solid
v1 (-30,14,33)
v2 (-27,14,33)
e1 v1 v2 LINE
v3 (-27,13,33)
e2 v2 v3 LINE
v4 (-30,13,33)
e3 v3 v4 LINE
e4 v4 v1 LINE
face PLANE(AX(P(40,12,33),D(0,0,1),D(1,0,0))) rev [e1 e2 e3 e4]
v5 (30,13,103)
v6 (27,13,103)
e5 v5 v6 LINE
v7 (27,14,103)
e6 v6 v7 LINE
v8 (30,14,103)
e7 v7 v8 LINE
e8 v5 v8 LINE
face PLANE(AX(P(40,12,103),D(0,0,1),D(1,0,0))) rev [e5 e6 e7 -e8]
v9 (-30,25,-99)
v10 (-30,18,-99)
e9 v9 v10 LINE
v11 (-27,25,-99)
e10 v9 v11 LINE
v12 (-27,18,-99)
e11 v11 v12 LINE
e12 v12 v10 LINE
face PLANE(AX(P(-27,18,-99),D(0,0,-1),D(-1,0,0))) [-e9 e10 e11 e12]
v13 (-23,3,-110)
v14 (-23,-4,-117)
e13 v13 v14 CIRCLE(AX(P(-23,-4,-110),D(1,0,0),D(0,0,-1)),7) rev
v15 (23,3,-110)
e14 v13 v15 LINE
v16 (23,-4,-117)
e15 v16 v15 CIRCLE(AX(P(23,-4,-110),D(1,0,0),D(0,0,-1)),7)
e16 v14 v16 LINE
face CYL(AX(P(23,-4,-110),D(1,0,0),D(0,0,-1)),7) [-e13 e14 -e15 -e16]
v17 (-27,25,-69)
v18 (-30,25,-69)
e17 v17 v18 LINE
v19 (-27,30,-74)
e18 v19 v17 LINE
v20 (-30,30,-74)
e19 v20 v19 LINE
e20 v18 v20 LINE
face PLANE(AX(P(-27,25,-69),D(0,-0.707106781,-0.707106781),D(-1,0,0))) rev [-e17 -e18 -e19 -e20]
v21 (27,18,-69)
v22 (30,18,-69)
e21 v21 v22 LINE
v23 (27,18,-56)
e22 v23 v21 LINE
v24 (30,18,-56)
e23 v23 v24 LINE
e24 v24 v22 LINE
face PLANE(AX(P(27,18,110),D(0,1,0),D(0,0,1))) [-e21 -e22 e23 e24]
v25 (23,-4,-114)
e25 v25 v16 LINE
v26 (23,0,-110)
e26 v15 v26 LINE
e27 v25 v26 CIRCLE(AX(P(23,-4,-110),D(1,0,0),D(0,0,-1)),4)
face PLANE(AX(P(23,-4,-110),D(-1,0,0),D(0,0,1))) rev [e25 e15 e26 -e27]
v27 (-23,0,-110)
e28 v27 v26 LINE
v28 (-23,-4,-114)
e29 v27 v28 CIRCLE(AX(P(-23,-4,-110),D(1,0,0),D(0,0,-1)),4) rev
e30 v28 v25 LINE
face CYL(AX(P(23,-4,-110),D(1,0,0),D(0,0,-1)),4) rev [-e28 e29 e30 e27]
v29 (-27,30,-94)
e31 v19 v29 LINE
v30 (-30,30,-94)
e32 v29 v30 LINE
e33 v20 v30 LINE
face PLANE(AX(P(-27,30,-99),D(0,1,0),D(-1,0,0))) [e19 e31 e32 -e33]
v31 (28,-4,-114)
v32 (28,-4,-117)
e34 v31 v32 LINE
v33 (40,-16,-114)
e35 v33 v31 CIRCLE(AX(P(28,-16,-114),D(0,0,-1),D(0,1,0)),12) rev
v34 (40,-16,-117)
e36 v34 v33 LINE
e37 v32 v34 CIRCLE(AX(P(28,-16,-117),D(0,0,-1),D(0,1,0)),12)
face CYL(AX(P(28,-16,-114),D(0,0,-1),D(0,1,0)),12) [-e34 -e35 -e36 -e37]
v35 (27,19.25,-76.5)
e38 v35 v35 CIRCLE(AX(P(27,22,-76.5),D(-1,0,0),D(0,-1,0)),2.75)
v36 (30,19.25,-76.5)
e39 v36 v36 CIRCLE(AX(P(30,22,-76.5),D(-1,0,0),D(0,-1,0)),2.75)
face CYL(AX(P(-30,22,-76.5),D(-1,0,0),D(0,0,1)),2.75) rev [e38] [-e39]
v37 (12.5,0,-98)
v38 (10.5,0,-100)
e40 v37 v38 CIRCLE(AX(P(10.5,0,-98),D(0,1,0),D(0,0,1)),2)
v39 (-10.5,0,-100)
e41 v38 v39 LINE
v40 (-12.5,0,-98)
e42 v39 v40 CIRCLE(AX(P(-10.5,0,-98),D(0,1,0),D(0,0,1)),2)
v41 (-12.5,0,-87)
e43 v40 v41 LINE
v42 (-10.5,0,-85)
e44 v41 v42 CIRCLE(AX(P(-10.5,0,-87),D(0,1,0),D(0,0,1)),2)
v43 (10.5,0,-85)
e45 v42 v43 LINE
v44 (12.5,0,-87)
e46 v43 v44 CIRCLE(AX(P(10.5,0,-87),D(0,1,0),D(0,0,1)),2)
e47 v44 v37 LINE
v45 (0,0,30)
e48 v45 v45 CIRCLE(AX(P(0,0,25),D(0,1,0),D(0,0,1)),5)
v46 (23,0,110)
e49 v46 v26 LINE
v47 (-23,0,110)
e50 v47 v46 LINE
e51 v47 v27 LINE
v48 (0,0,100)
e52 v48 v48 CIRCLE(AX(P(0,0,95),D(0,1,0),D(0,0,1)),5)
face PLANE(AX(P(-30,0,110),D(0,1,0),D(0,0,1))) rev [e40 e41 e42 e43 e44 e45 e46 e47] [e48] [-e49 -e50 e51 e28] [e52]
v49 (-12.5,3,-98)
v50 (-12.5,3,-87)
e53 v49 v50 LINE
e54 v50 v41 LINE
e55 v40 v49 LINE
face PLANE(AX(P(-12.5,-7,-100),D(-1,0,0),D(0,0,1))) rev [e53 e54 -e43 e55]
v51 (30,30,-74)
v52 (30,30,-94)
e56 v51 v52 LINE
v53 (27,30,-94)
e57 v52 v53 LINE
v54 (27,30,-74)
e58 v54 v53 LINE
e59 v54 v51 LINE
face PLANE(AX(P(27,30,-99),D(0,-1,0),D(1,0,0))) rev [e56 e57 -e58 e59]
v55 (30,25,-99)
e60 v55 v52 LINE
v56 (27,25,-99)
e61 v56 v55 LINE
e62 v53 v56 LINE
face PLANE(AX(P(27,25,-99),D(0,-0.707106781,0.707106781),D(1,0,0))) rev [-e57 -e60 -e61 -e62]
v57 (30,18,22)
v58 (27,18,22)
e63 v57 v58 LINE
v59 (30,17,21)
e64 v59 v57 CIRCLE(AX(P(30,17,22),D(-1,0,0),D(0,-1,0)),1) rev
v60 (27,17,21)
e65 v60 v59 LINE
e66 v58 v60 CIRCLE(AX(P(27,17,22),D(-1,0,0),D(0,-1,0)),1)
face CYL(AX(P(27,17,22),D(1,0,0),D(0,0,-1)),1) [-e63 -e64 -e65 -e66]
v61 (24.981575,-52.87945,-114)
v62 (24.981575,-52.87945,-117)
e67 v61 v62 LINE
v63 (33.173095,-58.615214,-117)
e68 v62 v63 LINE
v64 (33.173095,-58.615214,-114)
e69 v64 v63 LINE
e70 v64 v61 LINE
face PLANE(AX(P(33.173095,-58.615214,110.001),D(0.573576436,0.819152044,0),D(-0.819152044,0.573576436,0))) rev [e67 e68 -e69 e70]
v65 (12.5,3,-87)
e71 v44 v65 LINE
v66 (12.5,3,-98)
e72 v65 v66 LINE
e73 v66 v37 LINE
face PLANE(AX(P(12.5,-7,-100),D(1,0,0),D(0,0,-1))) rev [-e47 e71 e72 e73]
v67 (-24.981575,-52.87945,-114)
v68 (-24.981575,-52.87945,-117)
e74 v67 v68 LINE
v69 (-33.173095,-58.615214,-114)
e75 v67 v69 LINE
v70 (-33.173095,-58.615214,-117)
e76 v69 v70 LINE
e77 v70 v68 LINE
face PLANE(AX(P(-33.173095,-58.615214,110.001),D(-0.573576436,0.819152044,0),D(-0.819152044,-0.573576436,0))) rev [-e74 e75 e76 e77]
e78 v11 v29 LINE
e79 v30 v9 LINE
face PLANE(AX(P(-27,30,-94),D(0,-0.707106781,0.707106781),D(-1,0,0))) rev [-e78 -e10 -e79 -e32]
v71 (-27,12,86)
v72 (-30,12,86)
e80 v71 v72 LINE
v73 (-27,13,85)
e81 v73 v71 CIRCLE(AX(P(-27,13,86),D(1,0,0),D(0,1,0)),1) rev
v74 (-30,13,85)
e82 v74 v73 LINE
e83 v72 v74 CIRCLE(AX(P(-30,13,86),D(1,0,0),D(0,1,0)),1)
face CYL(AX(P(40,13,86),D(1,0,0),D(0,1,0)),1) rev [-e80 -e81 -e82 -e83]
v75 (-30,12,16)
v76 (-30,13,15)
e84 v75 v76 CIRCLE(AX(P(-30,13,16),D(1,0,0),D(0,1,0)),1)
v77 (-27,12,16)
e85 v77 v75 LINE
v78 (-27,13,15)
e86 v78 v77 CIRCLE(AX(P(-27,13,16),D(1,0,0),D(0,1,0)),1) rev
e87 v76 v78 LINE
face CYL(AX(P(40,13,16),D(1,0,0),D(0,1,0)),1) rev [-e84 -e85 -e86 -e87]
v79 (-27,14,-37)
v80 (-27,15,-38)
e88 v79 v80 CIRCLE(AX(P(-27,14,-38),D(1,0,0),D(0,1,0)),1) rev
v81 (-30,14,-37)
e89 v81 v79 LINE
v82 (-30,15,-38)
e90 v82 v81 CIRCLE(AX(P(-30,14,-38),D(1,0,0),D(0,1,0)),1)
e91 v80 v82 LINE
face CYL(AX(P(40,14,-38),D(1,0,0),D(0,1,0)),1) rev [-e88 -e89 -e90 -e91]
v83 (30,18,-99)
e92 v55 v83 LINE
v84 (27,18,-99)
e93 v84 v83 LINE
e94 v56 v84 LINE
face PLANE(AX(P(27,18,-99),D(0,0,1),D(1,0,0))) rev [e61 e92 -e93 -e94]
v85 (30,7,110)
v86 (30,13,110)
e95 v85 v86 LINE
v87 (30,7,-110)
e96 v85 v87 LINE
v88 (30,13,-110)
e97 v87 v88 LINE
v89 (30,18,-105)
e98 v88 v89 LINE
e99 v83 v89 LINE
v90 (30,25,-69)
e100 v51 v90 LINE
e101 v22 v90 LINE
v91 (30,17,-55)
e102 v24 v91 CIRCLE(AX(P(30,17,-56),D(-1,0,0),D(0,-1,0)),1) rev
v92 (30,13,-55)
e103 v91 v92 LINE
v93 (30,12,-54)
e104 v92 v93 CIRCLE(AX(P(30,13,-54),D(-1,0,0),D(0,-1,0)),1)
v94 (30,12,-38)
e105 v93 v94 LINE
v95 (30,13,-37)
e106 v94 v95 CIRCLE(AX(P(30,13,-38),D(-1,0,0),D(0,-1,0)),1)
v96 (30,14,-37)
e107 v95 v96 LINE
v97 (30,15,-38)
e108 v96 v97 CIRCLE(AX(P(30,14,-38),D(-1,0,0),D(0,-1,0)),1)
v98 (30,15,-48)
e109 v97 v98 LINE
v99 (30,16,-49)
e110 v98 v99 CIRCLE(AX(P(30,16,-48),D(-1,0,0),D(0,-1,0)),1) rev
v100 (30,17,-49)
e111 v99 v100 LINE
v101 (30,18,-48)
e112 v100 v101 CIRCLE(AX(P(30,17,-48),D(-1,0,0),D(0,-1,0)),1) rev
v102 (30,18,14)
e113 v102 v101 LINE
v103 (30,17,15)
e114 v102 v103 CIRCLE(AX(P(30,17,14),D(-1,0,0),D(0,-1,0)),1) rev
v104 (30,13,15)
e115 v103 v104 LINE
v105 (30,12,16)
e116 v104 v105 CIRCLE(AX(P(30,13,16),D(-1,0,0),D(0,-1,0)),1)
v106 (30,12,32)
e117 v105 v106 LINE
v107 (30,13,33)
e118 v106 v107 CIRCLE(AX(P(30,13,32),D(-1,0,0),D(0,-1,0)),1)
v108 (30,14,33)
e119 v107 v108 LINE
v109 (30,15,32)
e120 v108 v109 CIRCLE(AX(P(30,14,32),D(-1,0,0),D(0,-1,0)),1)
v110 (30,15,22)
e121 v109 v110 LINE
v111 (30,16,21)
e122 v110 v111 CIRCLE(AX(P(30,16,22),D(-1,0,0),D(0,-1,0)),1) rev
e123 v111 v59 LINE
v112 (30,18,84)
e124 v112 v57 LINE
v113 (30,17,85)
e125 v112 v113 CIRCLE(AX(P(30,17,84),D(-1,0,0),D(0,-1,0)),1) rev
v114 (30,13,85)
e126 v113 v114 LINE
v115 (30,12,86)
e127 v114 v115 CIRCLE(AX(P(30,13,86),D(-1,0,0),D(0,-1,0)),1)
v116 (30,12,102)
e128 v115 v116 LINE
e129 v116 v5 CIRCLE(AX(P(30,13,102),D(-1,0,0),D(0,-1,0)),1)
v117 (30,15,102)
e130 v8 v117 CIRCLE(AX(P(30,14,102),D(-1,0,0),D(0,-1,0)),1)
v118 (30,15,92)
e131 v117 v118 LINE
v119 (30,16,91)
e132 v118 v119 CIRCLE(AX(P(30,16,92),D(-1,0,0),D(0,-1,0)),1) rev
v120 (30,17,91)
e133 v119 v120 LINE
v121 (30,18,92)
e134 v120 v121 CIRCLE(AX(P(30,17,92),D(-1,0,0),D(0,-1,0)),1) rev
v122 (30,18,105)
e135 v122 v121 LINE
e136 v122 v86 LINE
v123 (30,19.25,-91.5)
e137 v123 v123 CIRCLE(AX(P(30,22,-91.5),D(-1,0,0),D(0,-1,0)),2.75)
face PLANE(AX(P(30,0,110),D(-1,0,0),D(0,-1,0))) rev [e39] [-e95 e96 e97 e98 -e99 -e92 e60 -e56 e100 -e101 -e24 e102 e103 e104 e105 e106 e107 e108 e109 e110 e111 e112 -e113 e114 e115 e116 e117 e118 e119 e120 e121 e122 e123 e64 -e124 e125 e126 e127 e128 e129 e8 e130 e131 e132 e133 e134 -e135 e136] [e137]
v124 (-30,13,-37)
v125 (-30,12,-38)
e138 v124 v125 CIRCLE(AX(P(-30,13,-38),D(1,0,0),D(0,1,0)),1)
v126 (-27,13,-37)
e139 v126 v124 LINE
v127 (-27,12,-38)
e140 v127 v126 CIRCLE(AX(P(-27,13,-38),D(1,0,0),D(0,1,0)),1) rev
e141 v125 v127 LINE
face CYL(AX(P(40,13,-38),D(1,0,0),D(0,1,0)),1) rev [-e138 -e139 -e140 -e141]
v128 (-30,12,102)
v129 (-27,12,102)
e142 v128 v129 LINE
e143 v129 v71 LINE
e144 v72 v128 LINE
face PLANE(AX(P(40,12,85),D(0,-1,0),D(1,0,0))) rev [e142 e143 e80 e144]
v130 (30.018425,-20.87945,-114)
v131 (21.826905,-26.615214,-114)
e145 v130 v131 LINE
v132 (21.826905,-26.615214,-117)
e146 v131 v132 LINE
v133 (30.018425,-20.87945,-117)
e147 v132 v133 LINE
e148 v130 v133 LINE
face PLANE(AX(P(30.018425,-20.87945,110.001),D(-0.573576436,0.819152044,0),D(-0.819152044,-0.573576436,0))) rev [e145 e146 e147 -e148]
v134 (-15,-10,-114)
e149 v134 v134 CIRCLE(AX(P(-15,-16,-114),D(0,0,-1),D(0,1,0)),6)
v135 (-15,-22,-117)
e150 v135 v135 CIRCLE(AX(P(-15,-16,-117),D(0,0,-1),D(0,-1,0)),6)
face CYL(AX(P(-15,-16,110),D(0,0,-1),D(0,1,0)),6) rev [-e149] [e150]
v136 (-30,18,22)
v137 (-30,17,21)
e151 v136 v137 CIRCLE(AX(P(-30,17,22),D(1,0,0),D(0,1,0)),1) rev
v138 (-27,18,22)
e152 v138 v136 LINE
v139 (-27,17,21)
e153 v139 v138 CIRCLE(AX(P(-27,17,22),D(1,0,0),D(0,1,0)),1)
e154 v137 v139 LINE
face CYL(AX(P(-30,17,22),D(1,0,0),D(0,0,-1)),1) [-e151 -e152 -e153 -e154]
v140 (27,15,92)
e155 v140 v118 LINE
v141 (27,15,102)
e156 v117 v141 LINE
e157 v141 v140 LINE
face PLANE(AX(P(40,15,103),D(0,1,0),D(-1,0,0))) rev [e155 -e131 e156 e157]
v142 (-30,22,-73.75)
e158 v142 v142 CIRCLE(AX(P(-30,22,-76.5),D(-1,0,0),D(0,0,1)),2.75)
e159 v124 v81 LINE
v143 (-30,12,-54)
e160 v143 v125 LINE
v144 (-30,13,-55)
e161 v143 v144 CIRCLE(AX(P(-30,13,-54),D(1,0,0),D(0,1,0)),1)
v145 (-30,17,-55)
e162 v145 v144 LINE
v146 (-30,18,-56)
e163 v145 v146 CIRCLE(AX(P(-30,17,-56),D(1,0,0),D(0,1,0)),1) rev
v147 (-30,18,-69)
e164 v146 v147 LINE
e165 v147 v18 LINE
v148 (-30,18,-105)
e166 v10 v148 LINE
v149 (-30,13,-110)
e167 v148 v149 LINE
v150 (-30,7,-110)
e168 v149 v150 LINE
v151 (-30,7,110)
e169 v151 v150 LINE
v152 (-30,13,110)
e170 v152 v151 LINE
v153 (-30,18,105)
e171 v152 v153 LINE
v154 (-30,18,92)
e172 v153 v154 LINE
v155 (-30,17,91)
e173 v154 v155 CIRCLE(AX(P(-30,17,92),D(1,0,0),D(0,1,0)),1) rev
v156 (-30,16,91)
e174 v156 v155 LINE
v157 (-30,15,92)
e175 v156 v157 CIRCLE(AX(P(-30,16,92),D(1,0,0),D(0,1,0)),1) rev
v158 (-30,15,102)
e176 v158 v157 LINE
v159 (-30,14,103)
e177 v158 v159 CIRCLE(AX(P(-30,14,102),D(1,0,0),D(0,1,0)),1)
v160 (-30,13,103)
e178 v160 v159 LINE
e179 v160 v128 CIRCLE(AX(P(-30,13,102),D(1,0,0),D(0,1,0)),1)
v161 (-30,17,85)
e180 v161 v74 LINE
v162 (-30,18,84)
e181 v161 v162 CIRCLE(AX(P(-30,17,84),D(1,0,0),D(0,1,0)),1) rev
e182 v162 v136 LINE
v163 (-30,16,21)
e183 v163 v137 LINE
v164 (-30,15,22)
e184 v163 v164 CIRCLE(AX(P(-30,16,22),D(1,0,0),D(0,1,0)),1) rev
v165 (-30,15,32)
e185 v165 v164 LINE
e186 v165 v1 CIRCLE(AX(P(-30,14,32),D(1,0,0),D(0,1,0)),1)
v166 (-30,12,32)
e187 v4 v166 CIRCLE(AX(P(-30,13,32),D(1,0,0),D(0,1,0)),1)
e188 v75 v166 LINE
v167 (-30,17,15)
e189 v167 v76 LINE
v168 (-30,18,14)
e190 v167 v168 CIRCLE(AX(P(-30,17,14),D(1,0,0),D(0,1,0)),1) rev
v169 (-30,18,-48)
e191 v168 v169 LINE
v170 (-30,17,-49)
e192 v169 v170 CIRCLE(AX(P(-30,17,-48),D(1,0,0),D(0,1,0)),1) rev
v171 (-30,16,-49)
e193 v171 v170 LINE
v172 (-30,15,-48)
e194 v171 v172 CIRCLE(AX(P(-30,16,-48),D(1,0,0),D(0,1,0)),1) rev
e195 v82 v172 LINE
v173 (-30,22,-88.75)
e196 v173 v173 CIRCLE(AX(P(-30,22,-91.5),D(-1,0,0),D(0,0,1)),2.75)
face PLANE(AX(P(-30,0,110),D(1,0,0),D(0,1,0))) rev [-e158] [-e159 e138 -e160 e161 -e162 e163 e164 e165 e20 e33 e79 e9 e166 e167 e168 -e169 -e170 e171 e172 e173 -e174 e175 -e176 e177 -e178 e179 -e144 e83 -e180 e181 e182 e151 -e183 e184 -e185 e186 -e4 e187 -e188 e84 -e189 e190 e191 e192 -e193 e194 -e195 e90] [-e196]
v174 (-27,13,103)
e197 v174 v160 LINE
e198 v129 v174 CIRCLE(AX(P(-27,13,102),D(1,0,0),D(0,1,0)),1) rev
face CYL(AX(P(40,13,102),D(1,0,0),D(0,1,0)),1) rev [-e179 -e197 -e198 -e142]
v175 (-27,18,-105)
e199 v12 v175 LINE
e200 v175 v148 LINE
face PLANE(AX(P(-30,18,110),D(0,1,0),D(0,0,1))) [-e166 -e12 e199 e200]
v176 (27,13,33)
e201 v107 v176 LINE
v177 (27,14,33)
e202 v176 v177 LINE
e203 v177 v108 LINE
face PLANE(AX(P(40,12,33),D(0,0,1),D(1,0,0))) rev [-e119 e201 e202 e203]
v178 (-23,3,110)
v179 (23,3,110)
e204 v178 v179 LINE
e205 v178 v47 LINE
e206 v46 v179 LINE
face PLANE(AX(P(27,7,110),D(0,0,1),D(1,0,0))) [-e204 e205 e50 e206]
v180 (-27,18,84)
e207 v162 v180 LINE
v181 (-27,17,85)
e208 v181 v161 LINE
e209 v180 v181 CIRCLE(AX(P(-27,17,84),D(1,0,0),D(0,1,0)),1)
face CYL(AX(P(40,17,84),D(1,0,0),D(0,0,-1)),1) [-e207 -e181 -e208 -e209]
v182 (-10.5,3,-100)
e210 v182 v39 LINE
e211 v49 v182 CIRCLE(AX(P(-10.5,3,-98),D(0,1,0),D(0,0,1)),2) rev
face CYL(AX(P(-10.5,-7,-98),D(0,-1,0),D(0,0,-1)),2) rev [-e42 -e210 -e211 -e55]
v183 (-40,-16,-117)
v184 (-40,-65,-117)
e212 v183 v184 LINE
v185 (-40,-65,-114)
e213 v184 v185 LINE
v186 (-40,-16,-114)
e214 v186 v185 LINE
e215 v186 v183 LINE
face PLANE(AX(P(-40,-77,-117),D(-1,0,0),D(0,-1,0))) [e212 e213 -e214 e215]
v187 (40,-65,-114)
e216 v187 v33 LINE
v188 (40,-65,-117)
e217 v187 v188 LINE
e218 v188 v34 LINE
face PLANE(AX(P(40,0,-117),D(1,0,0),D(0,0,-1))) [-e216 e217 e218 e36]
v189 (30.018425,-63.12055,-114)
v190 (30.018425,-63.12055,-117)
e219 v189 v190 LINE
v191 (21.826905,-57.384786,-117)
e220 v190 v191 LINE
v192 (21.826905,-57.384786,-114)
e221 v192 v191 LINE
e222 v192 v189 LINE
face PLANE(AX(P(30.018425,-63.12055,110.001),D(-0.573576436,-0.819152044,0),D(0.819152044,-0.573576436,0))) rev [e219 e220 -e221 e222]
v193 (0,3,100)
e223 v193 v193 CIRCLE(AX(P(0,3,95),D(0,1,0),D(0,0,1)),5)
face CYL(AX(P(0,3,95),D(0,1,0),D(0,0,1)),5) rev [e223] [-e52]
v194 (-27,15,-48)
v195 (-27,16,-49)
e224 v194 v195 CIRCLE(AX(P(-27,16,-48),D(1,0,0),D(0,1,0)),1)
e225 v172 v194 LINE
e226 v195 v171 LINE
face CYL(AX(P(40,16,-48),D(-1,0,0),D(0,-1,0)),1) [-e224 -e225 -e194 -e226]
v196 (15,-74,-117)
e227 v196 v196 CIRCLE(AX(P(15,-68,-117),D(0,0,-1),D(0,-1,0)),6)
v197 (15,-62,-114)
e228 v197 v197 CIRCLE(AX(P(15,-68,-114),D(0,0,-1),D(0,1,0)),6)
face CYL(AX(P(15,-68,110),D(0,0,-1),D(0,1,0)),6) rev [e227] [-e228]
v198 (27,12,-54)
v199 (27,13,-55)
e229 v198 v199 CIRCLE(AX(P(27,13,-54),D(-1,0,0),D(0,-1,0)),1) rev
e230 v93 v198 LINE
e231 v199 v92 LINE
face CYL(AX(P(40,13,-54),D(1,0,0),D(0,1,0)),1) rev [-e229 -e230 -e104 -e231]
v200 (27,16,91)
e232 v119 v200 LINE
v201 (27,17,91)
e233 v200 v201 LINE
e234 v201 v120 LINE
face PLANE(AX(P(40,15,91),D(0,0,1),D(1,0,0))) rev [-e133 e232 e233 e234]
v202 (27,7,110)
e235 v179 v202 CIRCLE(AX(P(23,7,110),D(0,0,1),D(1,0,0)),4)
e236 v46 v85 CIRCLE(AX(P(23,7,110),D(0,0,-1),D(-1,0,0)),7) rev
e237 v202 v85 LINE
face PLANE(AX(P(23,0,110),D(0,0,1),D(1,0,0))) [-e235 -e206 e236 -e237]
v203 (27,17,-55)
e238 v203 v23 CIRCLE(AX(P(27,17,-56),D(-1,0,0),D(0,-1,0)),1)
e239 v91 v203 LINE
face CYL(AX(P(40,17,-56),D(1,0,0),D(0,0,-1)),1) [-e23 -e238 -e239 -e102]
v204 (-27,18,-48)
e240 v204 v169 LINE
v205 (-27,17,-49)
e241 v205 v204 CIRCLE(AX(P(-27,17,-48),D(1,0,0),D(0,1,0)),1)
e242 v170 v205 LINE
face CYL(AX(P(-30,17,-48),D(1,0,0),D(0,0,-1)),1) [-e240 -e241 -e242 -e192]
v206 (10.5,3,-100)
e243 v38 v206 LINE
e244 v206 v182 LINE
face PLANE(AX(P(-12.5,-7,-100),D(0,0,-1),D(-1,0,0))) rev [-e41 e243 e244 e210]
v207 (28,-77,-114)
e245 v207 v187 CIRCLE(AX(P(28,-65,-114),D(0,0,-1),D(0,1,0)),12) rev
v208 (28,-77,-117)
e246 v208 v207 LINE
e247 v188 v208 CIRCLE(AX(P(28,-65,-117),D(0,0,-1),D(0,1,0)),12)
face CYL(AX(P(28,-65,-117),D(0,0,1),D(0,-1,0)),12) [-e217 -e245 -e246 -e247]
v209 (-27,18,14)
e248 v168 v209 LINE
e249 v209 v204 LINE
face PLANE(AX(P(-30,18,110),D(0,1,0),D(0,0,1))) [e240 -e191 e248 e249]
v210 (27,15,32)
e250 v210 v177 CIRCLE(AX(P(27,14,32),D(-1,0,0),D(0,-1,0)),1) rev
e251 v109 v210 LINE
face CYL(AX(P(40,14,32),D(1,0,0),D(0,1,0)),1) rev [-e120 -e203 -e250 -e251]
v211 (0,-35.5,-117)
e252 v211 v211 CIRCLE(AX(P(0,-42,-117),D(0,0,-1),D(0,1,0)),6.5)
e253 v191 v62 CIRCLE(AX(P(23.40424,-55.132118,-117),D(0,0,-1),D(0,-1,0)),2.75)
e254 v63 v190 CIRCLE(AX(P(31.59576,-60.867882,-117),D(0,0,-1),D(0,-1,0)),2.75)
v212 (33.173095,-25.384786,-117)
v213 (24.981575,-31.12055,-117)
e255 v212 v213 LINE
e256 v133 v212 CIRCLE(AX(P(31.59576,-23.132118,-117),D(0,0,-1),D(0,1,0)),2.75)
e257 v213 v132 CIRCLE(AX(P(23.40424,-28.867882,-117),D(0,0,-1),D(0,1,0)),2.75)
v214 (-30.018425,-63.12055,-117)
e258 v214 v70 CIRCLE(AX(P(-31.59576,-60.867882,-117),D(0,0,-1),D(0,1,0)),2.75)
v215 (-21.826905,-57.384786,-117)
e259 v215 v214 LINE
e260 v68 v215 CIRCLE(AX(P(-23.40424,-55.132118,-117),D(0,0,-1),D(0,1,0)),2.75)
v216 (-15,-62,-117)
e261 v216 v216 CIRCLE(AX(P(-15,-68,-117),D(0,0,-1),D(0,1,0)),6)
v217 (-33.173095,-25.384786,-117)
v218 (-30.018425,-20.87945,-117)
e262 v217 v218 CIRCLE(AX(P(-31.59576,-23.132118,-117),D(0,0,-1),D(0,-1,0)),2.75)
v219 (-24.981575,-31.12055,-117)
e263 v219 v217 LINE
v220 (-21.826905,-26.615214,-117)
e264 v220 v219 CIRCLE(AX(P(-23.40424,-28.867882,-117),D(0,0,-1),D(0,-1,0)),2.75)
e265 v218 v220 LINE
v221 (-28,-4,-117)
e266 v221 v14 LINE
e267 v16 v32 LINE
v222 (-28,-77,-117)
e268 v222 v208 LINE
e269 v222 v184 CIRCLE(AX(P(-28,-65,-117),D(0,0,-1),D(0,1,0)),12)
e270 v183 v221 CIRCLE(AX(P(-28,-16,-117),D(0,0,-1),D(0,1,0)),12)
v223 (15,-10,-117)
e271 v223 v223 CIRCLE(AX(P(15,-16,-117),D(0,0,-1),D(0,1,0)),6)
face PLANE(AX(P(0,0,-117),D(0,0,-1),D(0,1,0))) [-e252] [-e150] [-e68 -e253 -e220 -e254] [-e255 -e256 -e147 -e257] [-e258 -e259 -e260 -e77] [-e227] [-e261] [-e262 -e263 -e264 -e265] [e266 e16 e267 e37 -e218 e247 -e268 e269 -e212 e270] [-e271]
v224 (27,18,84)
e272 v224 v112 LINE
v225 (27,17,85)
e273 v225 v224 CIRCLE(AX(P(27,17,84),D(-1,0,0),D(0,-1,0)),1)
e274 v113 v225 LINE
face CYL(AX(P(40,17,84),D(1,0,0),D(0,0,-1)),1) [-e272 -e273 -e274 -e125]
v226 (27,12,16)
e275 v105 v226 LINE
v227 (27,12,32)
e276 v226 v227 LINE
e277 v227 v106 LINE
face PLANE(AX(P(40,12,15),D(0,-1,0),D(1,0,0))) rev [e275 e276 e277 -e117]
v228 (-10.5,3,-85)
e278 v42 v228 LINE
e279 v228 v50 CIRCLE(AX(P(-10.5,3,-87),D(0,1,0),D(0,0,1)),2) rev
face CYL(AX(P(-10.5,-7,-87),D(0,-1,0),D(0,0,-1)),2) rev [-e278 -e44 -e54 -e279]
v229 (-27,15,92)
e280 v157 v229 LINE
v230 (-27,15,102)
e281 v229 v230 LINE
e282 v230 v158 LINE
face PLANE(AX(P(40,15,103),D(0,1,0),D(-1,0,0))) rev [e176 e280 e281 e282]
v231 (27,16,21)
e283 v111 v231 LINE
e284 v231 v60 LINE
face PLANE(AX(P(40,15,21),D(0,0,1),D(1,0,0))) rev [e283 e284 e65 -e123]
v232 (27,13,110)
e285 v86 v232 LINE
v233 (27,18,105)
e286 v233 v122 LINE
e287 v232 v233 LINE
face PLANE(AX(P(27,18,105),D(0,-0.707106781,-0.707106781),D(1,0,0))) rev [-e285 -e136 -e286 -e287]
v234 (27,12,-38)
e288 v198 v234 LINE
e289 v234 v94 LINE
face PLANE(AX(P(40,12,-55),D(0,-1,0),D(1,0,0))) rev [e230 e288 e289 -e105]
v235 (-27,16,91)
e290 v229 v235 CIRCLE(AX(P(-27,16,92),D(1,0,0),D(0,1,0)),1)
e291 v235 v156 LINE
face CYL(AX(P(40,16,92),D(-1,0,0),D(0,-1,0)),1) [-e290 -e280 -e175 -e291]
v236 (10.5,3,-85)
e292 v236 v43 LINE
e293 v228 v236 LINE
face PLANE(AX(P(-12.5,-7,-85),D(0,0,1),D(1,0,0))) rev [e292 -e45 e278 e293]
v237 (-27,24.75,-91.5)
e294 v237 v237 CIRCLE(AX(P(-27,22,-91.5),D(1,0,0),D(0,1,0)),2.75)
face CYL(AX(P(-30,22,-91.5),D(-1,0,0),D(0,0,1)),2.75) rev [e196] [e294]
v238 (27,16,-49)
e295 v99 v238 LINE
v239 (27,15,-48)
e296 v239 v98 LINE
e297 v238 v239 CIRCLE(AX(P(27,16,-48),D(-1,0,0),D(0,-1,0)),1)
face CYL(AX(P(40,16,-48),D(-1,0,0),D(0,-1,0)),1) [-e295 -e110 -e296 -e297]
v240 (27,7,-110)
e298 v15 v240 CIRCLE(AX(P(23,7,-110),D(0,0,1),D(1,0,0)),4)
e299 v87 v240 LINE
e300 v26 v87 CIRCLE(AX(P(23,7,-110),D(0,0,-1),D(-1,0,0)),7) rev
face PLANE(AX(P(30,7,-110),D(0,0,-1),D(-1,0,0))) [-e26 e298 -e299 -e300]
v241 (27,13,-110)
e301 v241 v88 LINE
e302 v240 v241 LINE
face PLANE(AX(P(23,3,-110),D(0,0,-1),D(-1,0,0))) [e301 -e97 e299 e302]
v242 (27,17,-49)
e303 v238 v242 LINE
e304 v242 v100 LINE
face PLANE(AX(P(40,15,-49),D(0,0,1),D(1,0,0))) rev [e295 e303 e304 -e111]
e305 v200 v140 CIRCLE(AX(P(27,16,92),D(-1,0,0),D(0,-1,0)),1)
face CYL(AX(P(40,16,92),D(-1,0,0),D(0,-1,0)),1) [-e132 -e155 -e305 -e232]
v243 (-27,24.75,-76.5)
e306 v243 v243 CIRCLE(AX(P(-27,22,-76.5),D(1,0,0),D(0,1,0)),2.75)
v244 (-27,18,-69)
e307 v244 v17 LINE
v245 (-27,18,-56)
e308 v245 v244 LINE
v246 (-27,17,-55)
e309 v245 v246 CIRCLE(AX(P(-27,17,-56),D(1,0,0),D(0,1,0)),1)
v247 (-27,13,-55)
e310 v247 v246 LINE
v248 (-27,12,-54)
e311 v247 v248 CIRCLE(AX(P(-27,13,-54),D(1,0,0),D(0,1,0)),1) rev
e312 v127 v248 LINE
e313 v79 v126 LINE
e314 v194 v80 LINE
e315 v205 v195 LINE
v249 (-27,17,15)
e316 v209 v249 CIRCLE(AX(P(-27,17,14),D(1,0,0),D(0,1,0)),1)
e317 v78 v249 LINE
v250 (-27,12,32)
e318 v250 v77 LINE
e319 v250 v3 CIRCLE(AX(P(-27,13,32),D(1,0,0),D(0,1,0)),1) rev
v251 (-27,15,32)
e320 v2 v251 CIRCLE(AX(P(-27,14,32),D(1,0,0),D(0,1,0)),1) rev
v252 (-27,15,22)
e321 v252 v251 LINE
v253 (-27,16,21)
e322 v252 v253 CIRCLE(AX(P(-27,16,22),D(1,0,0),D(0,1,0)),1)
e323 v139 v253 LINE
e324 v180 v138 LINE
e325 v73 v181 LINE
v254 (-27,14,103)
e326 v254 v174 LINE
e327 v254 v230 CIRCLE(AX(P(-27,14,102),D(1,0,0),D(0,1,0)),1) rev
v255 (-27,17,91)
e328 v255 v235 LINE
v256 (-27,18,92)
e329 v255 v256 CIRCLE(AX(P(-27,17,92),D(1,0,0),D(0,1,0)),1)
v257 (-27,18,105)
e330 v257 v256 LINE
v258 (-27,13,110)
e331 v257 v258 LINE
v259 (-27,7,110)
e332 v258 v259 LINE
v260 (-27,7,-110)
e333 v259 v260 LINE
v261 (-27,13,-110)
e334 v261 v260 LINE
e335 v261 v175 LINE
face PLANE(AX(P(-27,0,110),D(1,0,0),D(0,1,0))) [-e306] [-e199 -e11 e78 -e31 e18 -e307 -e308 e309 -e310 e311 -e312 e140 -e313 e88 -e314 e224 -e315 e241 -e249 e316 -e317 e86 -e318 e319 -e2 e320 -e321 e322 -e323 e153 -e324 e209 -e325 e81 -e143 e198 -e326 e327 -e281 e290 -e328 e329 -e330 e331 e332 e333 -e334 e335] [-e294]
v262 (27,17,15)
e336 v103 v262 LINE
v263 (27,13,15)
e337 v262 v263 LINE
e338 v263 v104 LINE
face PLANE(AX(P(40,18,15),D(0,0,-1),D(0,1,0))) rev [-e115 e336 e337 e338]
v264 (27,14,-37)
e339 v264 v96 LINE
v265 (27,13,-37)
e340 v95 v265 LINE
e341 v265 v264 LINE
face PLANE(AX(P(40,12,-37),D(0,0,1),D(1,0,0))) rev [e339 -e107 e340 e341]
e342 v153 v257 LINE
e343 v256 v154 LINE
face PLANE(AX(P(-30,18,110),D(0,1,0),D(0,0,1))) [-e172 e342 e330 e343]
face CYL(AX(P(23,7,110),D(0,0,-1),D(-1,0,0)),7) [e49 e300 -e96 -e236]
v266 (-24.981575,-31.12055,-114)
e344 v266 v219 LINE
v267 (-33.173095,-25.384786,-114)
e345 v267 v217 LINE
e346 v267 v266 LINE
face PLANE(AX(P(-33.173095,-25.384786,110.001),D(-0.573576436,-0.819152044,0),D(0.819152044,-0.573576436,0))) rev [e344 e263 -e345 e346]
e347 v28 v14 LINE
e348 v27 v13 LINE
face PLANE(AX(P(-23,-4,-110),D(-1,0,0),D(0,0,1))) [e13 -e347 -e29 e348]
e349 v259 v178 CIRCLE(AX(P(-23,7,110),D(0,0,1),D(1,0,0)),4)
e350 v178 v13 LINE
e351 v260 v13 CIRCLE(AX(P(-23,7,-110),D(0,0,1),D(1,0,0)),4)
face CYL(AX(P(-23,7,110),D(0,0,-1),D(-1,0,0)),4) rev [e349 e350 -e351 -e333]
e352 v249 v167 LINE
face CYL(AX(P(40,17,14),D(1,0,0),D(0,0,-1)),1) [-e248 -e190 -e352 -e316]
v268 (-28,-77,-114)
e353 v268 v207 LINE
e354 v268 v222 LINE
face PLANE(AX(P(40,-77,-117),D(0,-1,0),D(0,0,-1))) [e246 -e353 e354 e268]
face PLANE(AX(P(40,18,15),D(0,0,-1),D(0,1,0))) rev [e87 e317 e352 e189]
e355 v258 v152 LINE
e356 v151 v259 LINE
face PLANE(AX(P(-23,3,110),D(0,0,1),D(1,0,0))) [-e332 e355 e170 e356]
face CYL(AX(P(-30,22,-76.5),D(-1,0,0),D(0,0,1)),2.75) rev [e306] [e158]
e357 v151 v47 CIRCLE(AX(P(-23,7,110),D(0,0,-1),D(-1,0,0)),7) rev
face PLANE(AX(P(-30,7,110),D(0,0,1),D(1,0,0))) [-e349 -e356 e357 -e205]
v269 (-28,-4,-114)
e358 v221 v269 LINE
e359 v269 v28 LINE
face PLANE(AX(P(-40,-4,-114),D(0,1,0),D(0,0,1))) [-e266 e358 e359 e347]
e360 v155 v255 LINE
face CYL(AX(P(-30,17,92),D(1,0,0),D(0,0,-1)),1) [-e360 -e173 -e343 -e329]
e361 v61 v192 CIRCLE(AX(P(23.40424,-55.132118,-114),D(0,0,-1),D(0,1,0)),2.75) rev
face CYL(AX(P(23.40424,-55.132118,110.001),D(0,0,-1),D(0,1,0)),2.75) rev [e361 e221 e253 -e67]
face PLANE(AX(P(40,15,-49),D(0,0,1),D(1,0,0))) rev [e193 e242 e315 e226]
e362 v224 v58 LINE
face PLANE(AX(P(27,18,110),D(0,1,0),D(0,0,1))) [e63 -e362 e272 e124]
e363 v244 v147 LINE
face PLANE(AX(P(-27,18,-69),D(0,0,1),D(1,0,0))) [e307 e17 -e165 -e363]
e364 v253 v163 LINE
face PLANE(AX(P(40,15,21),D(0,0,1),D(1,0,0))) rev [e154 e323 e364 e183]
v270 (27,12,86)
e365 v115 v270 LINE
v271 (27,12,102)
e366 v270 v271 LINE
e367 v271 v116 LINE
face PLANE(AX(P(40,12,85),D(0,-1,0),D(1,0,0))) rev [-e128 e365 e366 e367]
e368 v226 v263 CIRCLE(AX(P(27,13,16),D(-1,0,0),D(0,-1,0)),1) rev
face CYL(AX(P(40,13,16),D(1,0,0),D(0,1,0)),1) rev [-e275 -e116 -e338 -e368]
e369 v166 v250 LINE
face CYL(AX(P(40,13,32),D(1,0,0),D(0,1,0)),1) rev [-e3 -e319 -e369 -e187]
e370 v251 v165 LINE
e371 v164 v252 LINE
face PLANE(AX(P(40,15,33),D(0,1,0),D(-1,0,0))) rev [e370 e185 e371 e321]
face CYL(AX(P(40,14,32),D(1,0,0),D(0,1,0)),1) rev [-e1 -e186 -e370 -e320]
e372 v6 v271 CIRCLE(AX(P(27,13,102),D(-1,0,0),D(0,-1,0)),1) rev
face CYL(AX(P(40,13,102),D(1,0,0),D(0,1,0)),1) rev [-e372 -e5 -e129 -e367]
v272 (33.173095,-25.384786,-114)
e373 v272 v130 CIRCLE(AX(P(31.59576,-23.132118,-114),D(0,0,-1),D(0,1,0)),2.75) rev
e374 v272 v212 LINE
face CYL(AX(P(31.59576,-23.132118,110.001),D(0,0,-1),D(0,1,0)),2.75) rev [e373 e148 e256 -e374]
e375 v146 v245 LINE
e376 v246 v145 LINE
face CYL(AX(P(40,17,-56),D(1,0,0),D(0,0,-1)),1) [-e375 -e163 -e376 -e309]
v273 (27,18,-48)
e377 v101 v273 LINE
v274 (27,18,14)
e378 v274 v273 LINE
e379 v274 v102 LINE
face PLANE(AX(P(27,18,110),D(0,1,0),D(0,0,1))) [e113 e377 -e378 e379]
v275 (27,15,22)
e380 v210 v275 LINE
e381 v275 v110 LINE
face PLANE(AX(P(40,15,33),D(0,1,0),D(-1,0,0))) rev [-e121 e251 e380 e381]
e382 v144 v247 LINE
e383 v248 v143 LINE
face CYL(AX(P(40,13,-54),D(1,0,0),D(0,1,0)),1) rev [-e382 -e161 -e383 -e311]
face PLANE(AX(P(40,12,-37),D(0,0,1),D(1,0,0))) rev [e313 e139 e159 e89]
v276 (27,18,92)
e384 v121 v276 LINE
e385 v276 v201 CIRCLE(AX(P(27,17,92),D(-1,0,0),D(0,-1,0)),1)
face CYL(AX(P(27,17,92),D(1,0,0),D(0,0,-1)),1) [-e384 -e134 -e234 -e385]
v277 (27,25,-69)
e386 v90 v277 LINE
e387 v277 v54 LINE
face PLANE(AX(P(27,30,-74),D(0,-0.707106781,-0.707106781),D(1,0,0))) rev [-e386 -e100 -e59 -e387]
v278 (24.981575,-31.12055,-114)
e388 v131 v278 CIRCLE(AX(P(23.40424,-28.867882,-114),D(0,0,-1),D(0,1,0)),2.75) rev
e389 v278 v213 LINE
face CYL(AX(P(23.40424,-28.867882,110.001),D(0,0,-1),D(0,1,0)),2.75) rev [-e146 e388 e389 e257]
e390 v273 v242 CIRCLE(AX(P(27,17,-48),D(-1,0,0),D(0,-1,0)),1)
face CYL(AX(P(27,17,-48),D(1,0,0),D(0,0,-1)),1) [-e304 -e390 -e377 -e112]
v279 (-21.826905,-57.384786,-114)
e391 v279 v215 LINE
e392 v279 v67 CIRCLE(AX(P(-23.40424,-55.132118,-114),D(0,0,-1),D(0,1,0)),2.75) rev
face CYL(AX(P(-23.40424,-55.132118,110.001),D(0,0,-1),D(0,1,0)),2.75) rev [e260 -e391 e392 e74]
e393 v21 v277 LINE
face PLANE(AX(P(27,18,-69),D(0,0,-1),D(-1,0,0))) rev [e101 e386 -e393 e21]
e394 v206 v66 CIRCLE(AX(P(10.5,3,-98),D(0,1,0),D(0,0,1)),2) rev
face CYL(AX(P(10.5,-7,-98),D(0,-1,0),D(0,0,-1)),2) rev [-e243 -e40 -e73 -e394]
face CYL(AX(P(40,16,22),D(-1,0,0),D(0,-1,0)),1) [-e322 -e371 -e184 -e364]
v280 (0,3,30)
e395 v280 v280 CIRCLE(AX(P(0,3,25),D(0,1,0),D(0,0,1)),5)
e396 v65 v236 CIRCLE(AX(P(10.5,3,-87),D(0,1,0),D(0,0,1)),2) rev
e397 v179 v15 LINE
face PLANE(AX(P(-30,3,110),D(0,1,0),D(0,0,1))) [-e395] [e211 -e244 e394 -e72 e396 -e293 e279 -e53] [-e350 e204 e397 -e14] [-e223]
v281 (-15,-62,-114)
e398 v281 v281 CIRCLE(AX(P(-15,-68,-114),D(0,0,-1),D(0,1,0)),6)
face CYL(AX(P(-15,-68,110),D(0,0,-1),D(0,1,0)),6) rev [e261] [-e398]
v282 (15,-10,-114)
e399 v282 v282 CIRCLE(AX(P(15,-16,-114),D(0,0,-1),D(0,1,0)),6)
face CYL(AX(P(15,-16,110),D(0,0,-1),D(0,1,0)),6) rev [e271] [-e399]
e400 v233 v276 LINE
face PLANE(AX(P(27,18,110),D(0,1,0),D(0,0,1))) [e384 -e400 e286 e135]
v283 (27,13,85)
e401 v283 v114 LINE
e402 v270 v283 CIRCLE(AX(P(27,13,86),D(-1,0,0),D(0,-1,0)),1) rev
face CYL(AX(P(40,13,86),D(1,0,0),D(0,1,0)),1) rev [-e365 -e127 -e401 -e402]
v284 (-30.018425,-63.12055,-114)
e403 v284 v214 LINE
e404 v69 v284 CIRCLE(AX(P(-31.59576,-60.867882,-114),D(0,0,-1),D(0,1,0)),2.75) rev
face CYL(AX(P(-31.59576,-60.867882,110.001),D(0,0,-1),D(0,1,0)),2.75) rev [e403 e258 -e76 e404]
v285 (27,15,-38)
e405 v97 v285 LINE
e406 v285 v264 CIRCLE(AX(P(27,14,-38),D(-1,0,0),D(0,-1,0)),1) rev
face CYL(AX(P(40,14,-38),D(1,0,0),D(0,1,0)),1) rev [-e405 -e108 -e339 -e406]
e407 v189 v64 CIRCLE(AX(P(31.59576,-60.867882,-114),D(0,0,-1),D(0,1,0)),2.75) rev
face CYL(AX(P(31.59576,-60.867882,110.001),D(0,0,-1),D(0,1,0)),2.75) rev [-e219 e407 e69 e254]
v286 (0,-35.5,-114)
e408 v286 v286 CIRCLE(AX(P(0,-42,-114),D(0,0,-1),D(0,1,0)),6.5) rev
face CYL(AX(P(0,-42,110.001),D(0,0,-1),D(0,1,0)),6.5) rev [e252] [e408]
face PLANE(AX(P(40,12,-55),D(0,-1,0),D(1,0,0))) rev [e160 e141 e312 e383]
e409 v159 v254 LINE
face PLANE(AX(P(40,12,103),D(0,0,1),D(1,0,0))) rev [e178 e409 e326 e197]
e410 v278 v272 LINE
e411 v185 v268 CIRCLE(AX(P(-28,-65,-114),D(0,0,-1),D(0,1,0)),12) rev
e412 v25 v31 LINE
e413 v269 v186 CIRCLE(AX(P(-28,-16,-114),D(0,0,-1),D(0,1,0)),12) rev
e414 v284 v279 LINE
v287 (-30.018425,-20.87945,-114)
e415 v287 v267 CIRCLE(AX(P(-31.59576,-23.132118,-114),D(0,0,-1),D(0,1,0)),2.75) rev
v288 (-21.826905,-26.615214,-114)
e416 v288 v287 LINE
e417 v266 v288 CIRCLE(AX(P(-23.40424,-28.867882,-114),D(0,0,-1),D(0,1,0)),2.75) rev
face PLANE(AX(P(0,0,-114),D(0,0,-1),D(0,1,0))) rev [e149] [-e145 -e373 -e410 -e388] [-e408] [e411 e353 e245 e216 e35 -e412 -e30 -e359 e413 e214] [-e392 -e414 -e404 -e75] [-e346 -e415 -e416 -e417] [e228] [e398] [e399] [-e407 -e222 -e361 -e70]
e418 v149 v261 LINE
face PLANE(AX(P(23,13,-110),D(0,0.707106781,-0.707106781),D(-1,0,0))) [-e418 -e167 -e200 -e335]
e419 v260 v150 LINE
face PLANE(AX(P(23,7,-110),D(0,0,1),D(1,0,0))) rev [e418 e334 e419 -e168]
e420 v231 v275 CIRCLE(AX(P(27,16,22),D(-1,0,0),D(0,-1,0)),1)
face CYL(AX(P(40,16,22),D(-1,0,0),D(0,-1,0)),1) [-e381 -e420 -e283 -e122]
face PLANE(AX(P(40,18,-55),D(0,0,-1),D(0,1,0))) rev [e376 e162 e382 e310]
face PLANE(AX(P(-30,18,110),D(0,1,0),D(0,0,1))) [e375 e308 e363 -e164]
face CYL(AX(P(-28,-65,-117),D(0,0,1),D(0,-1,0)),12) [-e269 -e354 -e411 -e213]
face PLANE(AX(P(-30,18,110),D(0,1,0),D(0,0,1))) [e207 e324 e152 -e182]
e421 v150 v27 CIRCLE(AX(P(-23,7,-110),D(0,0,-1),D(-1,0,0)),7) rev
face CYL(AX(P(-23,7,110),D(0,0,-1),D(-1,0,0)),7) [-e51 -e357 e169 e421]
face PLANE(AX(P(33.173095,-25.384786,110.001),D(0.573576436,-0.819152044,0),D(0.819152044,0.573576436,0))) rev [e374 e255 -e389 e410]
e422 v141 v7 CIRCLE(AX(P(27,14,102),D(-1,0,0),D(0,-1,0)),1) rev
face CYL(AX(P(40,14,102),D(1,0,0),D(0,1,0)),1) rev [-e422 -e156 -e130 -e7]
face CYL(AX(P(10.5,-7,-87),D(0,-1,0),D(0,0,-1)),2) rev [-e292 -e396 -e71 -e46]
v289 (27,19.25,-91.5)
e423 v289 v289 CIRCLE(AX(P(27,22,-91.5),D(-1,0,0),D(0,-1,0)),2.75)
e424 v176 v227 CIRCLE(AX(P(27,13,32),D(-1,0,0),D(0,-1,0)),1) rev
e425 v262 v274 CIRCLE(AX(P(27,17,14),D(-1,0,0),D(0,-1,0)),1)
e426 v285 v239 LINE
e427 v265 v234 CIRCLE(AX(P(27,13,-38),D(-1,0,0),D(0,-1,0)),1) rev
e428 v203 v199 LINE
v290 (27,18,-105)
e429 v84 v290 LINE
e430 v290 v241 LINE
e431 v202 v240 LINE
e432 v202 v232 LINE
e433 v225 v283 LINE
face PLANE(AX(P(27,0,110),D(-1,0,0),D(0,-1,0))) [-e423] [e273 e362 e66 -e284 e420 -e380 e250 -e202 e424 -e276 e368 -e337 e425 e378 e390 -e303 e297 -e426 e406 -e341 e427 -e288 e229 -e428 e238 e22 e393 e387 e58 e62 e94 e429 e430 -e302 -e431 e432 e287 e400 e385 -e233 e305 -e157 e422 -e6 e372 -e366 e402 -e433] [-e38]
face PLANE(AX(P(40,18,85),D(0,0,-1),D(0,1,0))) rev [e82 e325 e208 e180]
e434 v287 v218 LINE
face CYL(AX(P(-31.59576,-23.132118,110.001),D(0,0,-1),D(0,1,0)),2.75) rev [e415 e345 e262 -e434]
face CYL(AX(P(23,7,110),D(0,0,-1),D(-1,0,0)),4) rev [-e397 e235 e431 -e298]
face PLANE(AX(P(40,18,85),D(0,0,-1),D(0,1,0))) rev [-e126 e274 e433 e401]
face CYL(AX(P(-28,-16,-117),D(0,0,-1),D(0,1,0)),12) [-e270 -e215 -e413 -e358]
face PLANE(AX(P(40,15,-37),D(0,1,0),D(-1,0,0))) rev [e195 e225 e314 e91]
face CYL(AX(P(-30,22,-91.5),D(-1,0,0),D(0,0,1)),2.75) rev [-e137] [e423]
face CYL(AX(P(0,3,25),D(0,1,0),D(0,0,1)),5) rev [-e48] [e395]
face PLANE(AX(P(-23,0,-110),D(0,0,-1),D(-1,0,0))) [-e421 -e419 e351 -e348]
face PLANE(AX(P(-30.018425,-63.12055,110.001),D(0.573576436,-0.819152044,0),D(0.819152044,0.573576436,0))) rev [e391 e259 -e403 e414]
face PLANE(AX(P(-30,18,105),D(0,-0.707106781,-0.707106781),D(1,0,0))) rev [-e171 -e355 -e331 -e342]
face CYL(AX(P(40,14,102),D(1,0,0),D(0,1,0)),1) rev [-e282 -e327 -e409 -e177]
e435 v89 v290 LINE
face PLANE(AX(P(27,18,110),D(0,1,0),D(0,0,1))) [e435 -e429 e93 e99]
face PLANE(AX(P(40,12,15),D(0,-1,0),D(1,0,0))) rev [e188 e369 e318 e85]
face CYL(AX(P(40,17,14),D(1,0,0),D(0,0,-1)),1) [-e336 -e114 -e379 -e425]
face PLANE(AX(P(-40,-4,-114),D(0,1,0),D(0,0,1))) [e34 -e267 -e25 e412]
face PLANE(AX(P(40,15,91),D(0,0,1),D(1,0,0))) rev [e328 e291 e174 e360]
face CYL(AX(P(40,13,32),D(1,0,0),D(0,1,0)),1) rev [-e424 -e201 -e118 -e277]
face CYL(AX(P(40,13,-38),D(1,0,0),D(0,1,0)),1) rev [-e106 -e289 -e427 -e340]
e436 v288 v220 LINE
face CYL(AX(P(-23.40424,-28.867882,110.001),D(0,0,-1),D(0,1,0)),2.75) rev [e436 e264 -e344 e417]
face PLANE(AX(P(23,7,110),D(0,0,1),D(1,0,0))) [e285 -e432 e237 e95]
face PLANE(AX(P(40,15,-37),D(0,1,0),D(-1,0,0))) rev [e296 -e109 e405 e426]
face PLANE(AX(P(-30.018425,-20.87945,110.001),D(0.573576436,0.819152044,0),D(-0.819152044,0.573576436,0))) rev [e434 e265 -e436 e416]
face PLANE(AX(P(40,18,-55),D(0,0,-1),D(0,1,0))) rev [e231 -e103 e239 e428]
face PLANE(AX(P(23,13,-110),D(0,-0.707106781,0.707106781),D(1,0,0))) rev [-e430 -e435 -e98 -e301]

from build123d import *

# Parameters (mm, degrees)
ODGI_CIE_BAZOWE1_DEPTH           = 110
ODGI_CIE_START                   = -40
ODGI_CIE_KRAW_DZI1_OUTLINE_W     = 73
ODGI_CIE_KRAW_DZI1_OUTLINE_H     = 3
ODGI_CIE_KRAW_DZI1_DEPTH         = 80
ODGI_CIE_START_2                 = -23
ODGI_CIE_KRAW_DZI1_2_DEPTH       = 46
WYTNIJ_WYCI_GNI_CIE1_REACH       = 245.019
OTW_R_POD_RUB_M81_D              = 10
OTW_R_POD_RUB_M81_DEPTH          = 10
OTW_R_POD_RUB_M81_TIP            = 3.004303095
SZKIC19_W                        = 25
SZKIC19_H                        = 15
WYTNIJ_WYCI_GNI_CIE2_DEPTH       = 10
ZAOKR_GLENIE1_R                  = 2
WYTNIJ_WYCI_GNI_CIE3_REACH       = 245.019
SZKIC20_R                        = 6.5
WYTNIJ_WYCI_GNI_CIE4_DEPTH       = 157.582246759
ZAOKR_GLENIE2_R                  = 1
SZYK_LINIOWY1_COUNT              = 3
SZYK_LINIOWY1_PITCH              = 70
ZAOKR_GLENIE2_OF_SZYK_LINIOWY1_R = 1
SZKIC22_R                        = 6
WYTNIJ_WYCI_GNI_CIE5_DEPTH       = 244.018517813
ZAOKR_GLENIE3_R                  = 12
SZKIC23_W                        = 30
SZKIC23_H                        = 12
WYPUST2_DEPTH                    = 3
SFAZOWANIE1_SIZE                 = 5
OTW_R_POD_RUB_M52_D              = 5.5


# Read off the part's stored shape, not the designer's step: Odgięcie krawędzi1
# Sheet-metal steps are written as plain solids
with BuildPart() as part:
    # Szkic1 → Odgięcie bazowe1 (new, symmetric)
    with BuildSketch(Plane.XY):
        with BuildLine():
            Line((-30, 18), (-30, 7))
            ThreePointArc((-30, 7), (-27.949747468, 2.050252532), (-23, 0))
            Line((-23, 0), (23, 0))
            ThreePointArc((23, 0), (27.949747468, 2.050252532), (30, 7))
            Line((30, 7), (30, 18))
            Line((30, 18), (27, 18))
            Line((27, 18), (27, 7))
            ThreePointArc((27, 7), (25.828427125, 4.171572875), (23, 3))
            Line((23, 3), (-23, 3))
            ThreePointArc((-23, 3), (-25.828427125, 4.171572875), (-27, 7))
            Line((-27, 7), (-27, 18))
            Line((-27, 18), (-30, 18))
        make_face()
    extrude(amount=ODGI_CIE_BAZOWE1_DEPTH, both=True)



with BuildPart() as body_2:
    # Odgięcie krawędzi1 outline → Odgięcie krawędzi1 (new body)
    with BuildSketch(Plane.YZ.offset(ODGI_CIE_START)):
        with Locations((-40.5, -115.5)):
            Rectangle(ODGI_CIE_KRAW_DZI1_OUTLINE_W, ODGI_CIE_KRAW_DZI1_OUTLINE_H)
    extrude(amount=ODGI_CIE_KRAW_DZI1_DEPTH)


with BuildPart() as part_1:
    add(part.part)

    add(body_2.part)  # Odgi_cie kraw_dzi1 2 merges body 2
    # Odgi_cie kraw_dzi1 2 outline → Odgi_cie kraw_dzi1 2 (add)
    with BuildSketch(Plane.YZ.offset(ODGI_CIE_START_2)):
        with BuildLine():
            Line((-4, -114), (-4, -117))
            ThreePointArc((-4, -117), (0.949747468, -114.949747468), (3, -110))
            Line((3, -110), (0, -110))
            ThreePointArc((0, -110), (-1.171572875, -112.828427125), (-4, -114))
        make_face()
    extrude(amount=ODGI_CIE_KRAW_DZI1_2_DEPTH)

    # Szkic9 → Wytnij-wyciągnięcie1 (cut, up to next)
    with BuildSketch(Plane(origin=(0, 0, -117), x_dir=(-1, 0, 0), z_dir=(0, 0, -1)), mode=Mode.PRIVATE) as wytnij_wyci_gni_cie1_sk1:
        with BuildLine():
            Line((-30.018425021, -20.879449696), (-21.826904579, -26.61521406))
            ThreePointArc((-21.826904579, -26.61521406), (-21.151571657, -30.445217382), (-24.981574979, -31.120550304))
            Line((-24.981574979, -31.120550304), (-33.173095421, -25.38478594))
            ThreePointArc((-33.173095421, -25.38478594), (-33.848428343, -21.554782618), (-30.018425021, -20.879449696))
        make_face()
    wytnij_wyci_gni_cie1_tool1 = extrude(wytnij_wyci_gni_cie1_sk1.sketch, amount=-WYTNIJ_WYCI_GNI_CIE1_REACH, mode=Mode.PRIVATE) & part_1.part
    # Szkic9 → Wytnij-wyciągnięcie1 (cut, up to next)
    with BuildSketch(Plane(origin=(0, 0, -117), x_dir=(-1, 0, 0), z_dir=(0, 0, -1)), mode=Mode.PRIVATE) as wytnij_wyci_gni_cie1_sk2:
        with BuildLine():
            Line((30.018425021, -20.879449696), (21.826904579, -26.61521406))
            ThreePointArc((21.826904579, -26.61521406), (21.151571657, -30.445217382), (24.981574979, -31.120550304))
            Line((24.981574979, -31.120550304), (33.173095421, -25.38478594))
            ThreePointArc((33.173095421, -25.38478594), (33.848428343, -21.554782618), (30.018425021, -20.879449696))
        make_face()
    wytnij_wyci_gni_cie1_tool2 = extrude(wytnij_wyci_gni_cie1_sk2.sketch, amount=-WYTNIJ_WYCI_GNI_CIE1_REACH, mode=Mode.PRIVATE) & part_1.part
    # Szkic9 → Wytnij-wyciągnięcie1 (cut, up to next)
    with BuildSketch(Plane(origin=(0, 0, -117), x_dir=(-1, 0, 0), z_dir=(0, 0, -1)), mode=Mode.PRIVATE) as wytnij_wyci_gni_cie1_sk3:
        with BuildLine():
            Line((-30.018425021, -63.120550304), (-21.826904579, -57.38478594))
            ThreePointArc((-21.826904579, -57.38478594), (-21.151571657, -53.554782618), (-24.981574979, -52.879449696))
            Line((-24.981574979, -52.879449696), (-33.173095421, -58.61521406))
            ThreePointArc((-33.173095421, -58.61521406), (-33.848428343, -62.445217382), (-30.018425021, -63.120550304))
        make_face()
    wytnij_wyci_gni_cie1_tool3 = extrude(wytnij_wyci_gni_cie1_sk3.sketch, amount=-WYTNIJ_WYCI_GNI_CIE1_REACH, mode=Mode.PRIVATE) & part_1.part
    # Szkic9 → Wytnij-wyciągnięcie1 (cut, up to next)
    with BuildSketch(Plane(origin=(0, 0, -117), x_dir=(-1, 0, 0), z_dir=(0, 0, -1)), mode=Mode.PRIVATE) as wytnij_wyci_gni_cie1_sk4:
        with BuildLine():
            Line((30.018425021, -63.120550304), (21.826904579, -57.38478594))
            ThreePointArc((21.826904579, -57.38478594), (21.151571657, -53.554782618), (24.981574979, -52.879449696))
            Line((24.981574979, -52.879449696), (33.173095421, -58.61521406))
            ThreePointArc((33.173095421, -58.61521406), (33.848428343, -62.445217382), (30.018425021, -63.120550304))
        make_face()
    wytnij_wyci_gni_cie1_tool4 = extrude(wytnij_wyci_gni_cie1_sk4.sketch, amount=-WYTNIJ_WYCI_GNI_CIE1_REACH, mode=Mode.PRIVATE) & part_1.part
    add(wytnij_wyci_gni_cie1_tool1.solids().sort_by_distance((27.5, -26, -117))[0], mode=Mode.SUBTRACT)
    add(wytnij_wyci_gni_cie1_tool2.solids().sort_by_distance((-27.5, -26, -117))[0], mode=Mode.SUBTRACT)
    add(wytnij_wyci_gni_cie1_tool3.solids().sort_by_distance((27.5, -58, -117))[0], mode=Mode.SUBTRACT)
    add(wytnij_wyci_gni_cie1_tool4.solids().sort_by_distance((-27.5, -58, -117))[0], mode=Mode.SUBTRACT)

    # Otwór pod śrubę M81
    with Locations(Plane(origin=(0, 3, 0), x_dir=(1, 0, 0), z_dir=(0, 1, 0))):
        with Locations((0, -95), (0, -25)):
            Hole(OTW_R_POD_RUB_M81_D / 2, depth=OTW_R_POD_RUB_M81_DEPTH)
            with Locations((0, 0, -(OTW_R_POD_RUB_M81_DEPTH + OTW_R_POD_RUB_M81_TIP / 2))):  # 118° drill point
                Cone(0, OTW_R_POD_RUB_M81_D / 2, OTW_R_POD_RUB_M81_TIP, mode=Mode.SUBTRACT)

    # Szkic19 → Wytnij-wyciągnięcie2 (cut)
    with BuildSketch(Plane(origin=(0, 3, 0), x_dir=(1, 0, 0), z_dir=(0, 1, 0))):
        with Locations((0, 92.5)):
            Rectangle(SZKIC19_W, SZKIC19_H)
    extrude(amount=-WYTNIJ_WYCI_GNI_CIE2_DEPTH, mode=Mode.SUBTRACT)

    # Zaokrąglenie1
    zaokr_glenie1_edges = [part_1.edges().sort_by_distance(p)[0] for p in [
        (-12.5, 1.5, -85),
        (-12.5, 1.5, -100),
        (12.5, 1.5, -100),
        (12.5, 1.5, -85),
    ]]
    fillet(zaokr_glenie1_edges, radius=ZAOKR_GLENIE1_R)

    # Szkic20 → Wytnij-wyciągnięcie3 (cut, up to next)
    with BuildSketch(Plane(origin=(0, 0, -117), x_dir=(-1, 0, 0), z_dir=(0, 0, -1)), mode=Mode.PRIVATE) as wytnij_wyci_gni_cie3_sk1:
        with Locations(Location((0, -42, 0), (0, 0, 90))):
            Circle(SZKIC20_R)
    wytnij_wyci_gni_cie3_tool1 = extrude(wytnij_wyci_gni_cie3_sk1.sketch, amount=-WYTNIJ_WYCI_GNI_CIE3_REACH, mode=Mode.PRIVATE) & part_1.part
    add(wytnij_wyci_gni_cie3_tool1.solids().sort_by_distance((0, -42, -117))[0], mode=Mode.SUBTRACT)

    # Szkic21 → Wytnij-wyciągnięcie4 (cut, through all)
    with BuildSketch(Plane.ZY.offset(30)):
        Polygon((-55, 18), (-55, 12), (-37, 12), (-37, 15), (-49, 15), (-49, 18), align=None)
    wytnij_wyci_gni_cie4 = extrude(amount=-WYTNIJ_WYCI_GNI_CIE4_DEPTH, mode=Mode.SUBTRACT)

    # Zaokrąglenie2
    zaokr_glenie2_edges = [part_1.edges().sort_by_distance(p)[0] for p in [
        (28.5, 18, -55),
        (28.5, 18, -49),
        (28.5, 15, -49),
        (28.5, 15, -37),
        (28.5, 12, -37),
        (28.5, 12, -55),
        (-28.5, 18, -55),
        (-28.5, 18, -49),
        (-28.5, 15, -49),
        (-28.5, 15, -37),
        (-28.5, 12, -37),
        (-28.5, 12, -55),
    ]]
    fillet(zaokr_glenie2_edges, radius=ZAOKR_GLENIE2_R)

    # Szyk liniowy1: Wytnij-wyciągnięcie4 ×3
    with Locations(*[(0, 0, i * SZYK_LINIOWY1_PITCH) for i in range(1, SZYK_LINIOWY1_COUNT)]):
        add(wytnij_wyci_gni_cie4, mode=Mode.SUBTRACT)

    # Zaokrąglenie2 of Szyk liniowy1
    zaokr_glenie2_of_szyk_liniowy1_edges = [part_1.edges().sort_by_distance(p)[0] for p in [
        (28.5, 18, 15),
        (28.5, 18, 21),
        (28.5, 15, 21),
        (28.5, 15, 33),
        (28.5, 12, 33),
        (28.5, 12, 15),
        (-28.5, 18, 15),
        (-28.5, 18, 21),
        (-28.5, 15, 21),
        (-28.5, 15, 33),
        (-28.5, 12, 33),
        (-28.5, 12, 15),
        (28.5, 18, 85),
        (28.5, 18, 91),
        (28.5, 15, 91),
        (28.5, 15, 103),
        (28.5, 12, 103),
        (28.5, 12, 85),
        (-28.5, 18, 85),
        (-28.5, 18, 91),
        (-28.5, 15, 91),
        (-28.5, 15, 103),
        (-28.5, 12, 103),
        (-28.5, 12, 85),
    ]]
    fillet(zaokr_glenie2_of_szyk_liniowy1_edges, radius=ZAOKR_GLENIE2_OF_SZYK_LINIOWY1_R)

    # Szkic22 → Wytnij-wyciągnięcie5 (cut, through all)
    with BuildSketch(Plane(origin=(0, 0, -117), x_dir=(-1, 0, 0), z_dir=(0, 0, -1))):
        with Locations(Location((-15, -16, 0), (0, 0, 90))):
            Circle(SZKIC22_R)
        with Locations(Location((15, -16, 0), (0, 0, 90))):
            Circle(SZKIC22_R)
        with Locations(Location((-15, -68, 0), (0, 0, 90))):
            Circle(SZKIC22_R)
        with Locations(Location((15, -68, 0), (0, 0, 90))):
            Circle(SZKIC22_R)
    extrude(amount=-WYTNIJ_WYCI_GNI_CIE5_DEPTH, mode=Mode.SUBTRACT)

    # Zaokrąglenie3
    zaokr_glenie3_edges = [part_1.edges().sort_by_distance(p)[0] for p in [
        (40, -4, -115.5),
        (-40, -4, -115.5),
        (-40, -77, -115.5),
        (40, -77, -115.5),
    ]]
    fillet(zaokr_glenie3_edges, radius=ZAOKR_GLENIE3_R)

    # Szkic23 → Wypust2 (add)
    with BuildSketch(Plane.ZY.offset(30)):
        with Locations((-84, 24)):
            Rectangle(SZKIC23_W, SZKIC23_H)
    wypust2 = extrude(amount=-WYPUST2_DEPTH)

    # Lustro2: Wypust2 across plane
    add(wypust2.mirror(Plane(origin=(0, 0, 0), x_dir=(0, 0, 1), z_dir=(1, 0, 0))))

    # Sfazowanie1
    sfazowanie1_edges = [part_1.edges().sort_by_distance(p)[0] for p in [
        (-28.5, 18, -110),
        (28.5, 18, -110),
        (-28.5, 18, 110),
        (-28.5, 30, -99),
        (-28.5, 30, -69),
        (28.5, 18, 110),
        (28.5, 30, -99),
        (28.5, 30, -69),
    ]]
    chamfer(sfazowanie1_edges, length=SFAZOWANIE1_SIZE)

    # Otwór pod śrubę M52 (through all)
    with Locations(Plane.ZY.offset(30)):
        with Locations((-91.5, 22), (-76.5, 22)):
            Hole(OTW_R_POD_RUB_M52_D / 2)


solid = part_1.part
